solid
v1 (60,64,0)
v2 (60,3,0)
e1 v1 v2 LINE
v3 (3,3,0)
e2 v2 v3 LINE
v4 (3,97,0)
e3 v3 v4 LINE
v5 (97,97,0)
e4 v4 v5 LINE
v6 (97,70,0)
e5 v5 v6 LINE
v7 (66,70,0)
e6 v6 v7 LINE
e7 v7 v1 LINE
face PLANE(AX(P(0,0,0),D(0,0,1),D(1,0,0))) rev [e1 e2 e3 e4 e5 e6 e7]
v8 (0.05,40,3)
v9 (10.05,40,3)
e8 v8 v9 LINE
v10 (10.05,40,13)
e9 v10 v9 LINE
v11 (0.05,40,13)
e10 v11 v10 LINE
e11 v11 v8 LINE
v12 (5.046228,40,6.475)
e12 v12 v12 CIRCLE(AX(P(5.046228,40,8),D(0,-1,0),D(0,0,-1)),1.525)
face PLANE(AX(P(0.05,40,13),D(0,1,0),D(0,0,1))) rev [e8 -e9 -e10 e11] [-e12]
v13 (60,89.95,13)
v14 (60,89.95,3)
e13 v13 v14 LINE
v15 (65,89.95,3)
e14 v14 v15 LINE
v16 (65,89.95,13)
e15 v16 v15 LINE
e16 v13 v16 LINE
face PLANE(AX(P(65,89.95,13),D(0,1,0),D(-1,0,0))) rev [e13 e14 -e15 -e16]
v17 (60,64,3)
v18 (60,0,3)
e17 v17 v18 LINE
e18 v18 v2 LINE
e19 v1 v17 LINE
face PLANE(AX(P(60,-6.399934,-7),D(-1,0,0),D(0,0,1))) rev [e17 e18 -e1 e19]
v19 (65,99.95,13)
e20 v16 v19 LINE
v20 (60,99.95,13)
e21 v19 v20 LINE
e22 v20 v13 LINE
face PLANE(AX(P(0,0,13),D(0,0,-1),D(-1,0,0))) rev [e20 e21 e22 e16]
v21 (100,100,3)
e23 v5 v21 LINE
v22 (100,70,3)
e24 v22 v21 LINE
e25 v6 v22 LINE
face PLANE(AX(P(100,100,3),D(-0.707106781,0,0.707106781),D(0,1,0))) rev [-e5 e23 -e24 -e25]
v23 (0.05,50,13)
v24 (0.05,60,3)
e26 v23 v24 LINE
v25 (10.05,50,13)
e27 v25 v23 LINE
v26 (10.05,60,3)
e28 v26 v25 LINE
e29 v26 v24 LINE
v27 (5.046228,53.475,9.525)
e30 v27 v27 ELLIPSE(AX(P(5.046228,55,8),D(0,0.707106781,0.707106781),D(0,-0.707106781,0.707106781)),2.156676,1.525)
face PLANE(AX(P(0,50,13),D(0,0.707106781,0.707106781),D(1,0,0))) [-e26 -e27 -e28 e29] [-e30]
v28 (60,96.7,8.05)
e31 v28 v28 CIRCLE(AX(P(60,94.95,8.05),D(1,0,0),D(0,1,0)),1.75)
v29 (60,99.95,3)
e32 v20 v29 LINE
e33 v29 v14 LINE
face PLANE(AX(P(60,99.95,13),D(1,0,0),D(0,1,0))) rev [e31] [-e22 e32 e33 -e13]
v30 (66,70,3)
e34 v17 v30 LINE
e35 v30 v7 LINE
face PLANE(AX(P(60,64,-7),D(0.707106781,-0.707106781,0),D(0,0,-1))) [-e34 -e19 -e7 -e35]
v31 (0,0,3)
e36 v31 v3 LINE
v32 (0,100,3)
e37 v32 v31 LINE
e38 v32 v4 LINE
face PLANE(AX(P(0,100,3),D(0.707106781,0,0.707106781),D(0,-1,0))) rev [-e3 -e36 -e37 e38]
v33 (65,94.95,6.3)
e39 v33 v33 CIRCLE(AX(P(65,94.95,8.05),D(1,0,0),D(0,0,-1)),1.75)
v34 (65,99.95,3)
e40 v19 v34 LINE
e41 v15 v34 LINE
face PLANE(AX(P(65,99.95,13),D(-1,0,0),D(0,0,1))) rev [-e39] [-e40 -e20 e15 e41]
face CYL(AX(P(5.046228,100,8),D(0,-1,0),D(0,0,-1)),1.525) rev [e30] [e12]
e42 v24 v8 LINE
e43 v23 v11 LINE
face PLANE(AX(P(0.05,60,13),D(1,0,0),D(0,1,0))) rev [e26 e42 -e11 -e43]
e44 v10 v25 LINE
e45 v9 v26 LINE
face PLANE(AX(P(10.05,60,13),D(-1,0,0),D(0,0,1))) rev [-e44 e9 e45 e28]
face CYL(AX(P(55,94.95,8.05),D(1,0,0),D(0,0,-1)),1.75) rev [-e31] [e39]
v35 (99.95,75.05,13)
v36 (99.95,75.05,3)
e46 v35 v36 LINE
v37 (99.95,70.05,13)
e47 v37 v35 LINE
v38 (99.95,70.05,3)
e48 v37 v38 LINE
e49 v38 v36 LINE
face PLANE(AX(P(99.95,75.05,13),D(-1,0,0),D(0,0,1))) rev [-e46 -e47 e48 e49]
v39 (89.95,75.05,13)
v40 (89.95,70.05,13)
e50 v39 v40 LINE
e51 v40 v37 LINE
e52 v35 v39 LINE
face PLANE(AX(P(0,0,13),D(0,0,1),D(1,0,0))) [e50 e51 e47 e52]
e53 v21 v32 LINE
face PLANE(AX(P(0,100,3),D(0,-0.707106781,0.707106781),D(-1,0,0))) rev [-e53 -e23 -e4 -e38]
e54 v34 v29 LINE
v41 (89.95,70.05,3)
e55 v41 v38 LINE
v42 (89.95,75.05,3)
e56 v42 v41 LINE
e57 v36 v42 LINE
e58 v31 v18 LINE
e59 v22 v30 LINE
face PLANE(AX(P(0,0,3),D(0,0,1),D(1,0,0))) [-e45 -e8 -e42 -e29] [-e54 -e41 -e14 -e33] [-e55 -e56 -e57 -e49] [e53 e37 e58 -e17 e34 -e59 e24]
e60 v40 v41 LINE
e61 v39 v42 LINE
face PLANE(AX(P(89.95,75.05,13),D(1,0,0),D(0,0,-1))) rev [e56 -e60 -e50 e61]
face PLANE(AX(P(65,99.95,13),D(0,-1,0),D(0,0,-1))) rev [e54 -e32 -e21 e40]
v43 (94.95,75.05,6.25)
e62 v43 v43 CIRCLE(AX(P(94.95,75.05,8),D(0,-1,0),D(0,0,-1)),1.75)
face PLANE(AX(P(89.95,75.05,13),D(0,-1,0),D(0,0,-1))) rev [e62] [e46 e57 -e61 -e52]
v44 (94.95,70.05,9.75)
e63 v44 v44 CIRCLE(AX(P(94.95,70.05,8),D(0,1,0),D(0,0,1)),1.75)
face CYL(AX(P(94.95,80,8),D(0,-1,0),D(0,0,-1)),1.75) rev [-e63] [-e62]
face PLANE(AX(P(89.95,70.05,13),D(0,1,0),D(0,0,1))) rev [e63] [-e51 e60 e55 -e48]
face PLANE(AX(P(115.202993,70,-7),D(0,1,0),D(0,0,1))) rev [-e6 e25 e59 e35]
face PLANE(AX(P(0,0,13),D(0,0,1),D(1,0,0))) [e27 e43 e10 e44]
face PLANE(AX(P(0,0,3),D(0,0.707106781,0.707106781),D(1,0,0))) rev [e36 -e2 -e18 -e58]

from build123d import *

# Parameters (mm, degrees)
ESQUISSE1_W             = 100
ESQUISSE1_H             = 100
BOSS_EXTRU_1_DEPTH      = 3
ESQUISSE2_W             = 10
ESQUISSE2_H             = 20
BOSS_EXTRU_2_DEPTH      = 10
CHANFREIN1_SIZE         = 10
ESQUISSE3_R             = 1.525
ENL_V_MAT_EXTRU_1_DEPTH = 118.3413823
CHANFREIN2_SIZE         = 3
ESQUISSE4_W             = 5
ESQUISSE4_H             = 10
BOSS_EXTRU_3_DEPTH      = 10
ESQUISSE5_R             = 1.75
ENL_V_MAT_EXTRU_2_DEPTH = 10
ESQUISSE6_W             = 55.202992824
ESQUISSE6_H             = 76.399934011
ENL_V_MAT_EXTRU_3_DEPTH = 10
ESQUISSE9_W             = 10
ESQUISSE9_H             = 5
BOSS_EXTRU_5_DEPTH      = 10
ESQUISSE10_R            = 1.75
ENL_V_MAT_EXTRU_5_DEPTH = 10
CHANFREIN3_SIZE         = 6


with BuildPart() as part:
    # Esquisse1 → Boss.-Extru.1 (new body)
    with BuildSketch(Plane.XY):
        with Locations((50, 50)):
            Rectangle(ESQUISSE1_W, ESQUISSE1_H)
    extrude(amount=BOSS_EXTRU_1_DEPTH)

    # Esquisse2 → Boss.-Extru.2 (add)
    with BuildSketch(Plane.XY.offset(3)):
        with Locations((5.05, 50)):
            Rectangle(ESQUISSE2_W, ESQUISSE2_H)
        with Locations((94.95, 50)):
            Rectangle(ESQUISSE2_W, ESQUISSE2_H)
    extrude(amount=BOSS_EXTRU_2_DEPTH)

    # Chanfrein1
    chanfrein1_edges = [part.edges().sort_by_distance(p)[0] for p in [
        (94.95, 60, 13),
        (5.05, 60, 13),
    ]]
    chamfer(chanfrein1_edges, length=CHANFREIN1_SIZE - 0.0001)  # a hair under: the kernel refuses the full size

    # Esquisse3 → Enlèv. mat.-Extru.1 (cut, through all)
    with BuildSketch(Plane.XZ.offset(-40)):
        with Locations(Location((5.046227865, 8, 0), (0, 0, 270))):
            Circle(ESQUISSE3_R)
        with Locations(Location((94.95, 8, 0), (0, 0, 270))):
            Circle(ESQUISSE3_R)
    extrude(amount=-ENL_V_MAT_EXTRU_1_DEPTH, mode=Mode.SUBTRACT)

    # Chanfrein2
    chanfrein2_edges = [part.edges().sort_by_distance(p)[0] for p in [
        (50, 0, 0),
        (100, 50, 0),
        (50, 100, 0),
        (0, 50, 0),
    ]]
    chamfer(chanfrein2_edges, length=CHANFREIN2_SIZE - 0.0001)  # a hair under: the kernel refuses the full size

    # Esquisse4 → Boss.-Extru.3 (add)
    with BuildSketch(Plane.XY.offset(3)):
        with Locations((62.5, 94.95)):
            Rectangle(ESQUISSE4_W, ESQUISSE4_H)
    extrude(amount=BOSS_EXTRU_3_DEPTH)

    # Esquisse5 → Enlèv. mat.-Extru.2 (cut)
    with BuildSketch(Plane(origin=(65, 0, 0), x_dir=(0, 0, -1), z_dir=(1, 0, 0))):
        with Locations((-8.05, 94.95)):
            Circle(ESQUISSE5_R)
    extrude(amount=-ENL_V_MAT_EXTRU_2_DEPTH, mode=Mode.SUBTRACT)

    # Esquisse6 → Enlèv. mat.-Extru.3 (cut)
    with BuildSketch(Plane.XY.offset(3)):
        with Locations((87.601496412, 31.800032995)):
            Rectangle(ESQUISSE6_W, ESQUISSE6_H)
    extrude(amount=-ENL_V_MAT_EXTRU_3_DEPTH, mode=Mode.SUBTRACT)


with BuildPart() as body_2:
    # of the pieces the cut leaves, the one that is kept (enl_v_mat_extru_3_keep)
    add(part.part.solids().sort_by_distance((0, 100, 2.9999))[0])

    # Esquisse9 → Boss.-Extru.5 (add)
    with BuildSketch(Plane.XY.offset(3)):
        with Locations((94.95, 72.55)):
            Rectangle(ESQUISSE9_W, ESQUISSE9_H)
    extrude(amount=BOSS_EXTRU_5_DEPTH)

    # Esquisse10 → Enlèv. mat.-Extru.5 (cut)
    with BuildSketch(Plane.XZ.offset(-70)):
        with Locations(Location((94.95, 8, 0), (0, 0, 270))):
            Circle(ESQUISSE10_R)
    extrude(amount=-ENL_V_MAT_EXTRU_5_DEPTH, mode=Mode.SUBTRACT)

    # Chanfrein3
    chanfrein3_edges = [body_2.edges().sort_by_distance(p)[0] for p in [
        (60, 70, 1.5),
    ]]
    chamfer(chanfrein3_edges, length=CHANFREIN3_SIZE)


solid = body_2.part
